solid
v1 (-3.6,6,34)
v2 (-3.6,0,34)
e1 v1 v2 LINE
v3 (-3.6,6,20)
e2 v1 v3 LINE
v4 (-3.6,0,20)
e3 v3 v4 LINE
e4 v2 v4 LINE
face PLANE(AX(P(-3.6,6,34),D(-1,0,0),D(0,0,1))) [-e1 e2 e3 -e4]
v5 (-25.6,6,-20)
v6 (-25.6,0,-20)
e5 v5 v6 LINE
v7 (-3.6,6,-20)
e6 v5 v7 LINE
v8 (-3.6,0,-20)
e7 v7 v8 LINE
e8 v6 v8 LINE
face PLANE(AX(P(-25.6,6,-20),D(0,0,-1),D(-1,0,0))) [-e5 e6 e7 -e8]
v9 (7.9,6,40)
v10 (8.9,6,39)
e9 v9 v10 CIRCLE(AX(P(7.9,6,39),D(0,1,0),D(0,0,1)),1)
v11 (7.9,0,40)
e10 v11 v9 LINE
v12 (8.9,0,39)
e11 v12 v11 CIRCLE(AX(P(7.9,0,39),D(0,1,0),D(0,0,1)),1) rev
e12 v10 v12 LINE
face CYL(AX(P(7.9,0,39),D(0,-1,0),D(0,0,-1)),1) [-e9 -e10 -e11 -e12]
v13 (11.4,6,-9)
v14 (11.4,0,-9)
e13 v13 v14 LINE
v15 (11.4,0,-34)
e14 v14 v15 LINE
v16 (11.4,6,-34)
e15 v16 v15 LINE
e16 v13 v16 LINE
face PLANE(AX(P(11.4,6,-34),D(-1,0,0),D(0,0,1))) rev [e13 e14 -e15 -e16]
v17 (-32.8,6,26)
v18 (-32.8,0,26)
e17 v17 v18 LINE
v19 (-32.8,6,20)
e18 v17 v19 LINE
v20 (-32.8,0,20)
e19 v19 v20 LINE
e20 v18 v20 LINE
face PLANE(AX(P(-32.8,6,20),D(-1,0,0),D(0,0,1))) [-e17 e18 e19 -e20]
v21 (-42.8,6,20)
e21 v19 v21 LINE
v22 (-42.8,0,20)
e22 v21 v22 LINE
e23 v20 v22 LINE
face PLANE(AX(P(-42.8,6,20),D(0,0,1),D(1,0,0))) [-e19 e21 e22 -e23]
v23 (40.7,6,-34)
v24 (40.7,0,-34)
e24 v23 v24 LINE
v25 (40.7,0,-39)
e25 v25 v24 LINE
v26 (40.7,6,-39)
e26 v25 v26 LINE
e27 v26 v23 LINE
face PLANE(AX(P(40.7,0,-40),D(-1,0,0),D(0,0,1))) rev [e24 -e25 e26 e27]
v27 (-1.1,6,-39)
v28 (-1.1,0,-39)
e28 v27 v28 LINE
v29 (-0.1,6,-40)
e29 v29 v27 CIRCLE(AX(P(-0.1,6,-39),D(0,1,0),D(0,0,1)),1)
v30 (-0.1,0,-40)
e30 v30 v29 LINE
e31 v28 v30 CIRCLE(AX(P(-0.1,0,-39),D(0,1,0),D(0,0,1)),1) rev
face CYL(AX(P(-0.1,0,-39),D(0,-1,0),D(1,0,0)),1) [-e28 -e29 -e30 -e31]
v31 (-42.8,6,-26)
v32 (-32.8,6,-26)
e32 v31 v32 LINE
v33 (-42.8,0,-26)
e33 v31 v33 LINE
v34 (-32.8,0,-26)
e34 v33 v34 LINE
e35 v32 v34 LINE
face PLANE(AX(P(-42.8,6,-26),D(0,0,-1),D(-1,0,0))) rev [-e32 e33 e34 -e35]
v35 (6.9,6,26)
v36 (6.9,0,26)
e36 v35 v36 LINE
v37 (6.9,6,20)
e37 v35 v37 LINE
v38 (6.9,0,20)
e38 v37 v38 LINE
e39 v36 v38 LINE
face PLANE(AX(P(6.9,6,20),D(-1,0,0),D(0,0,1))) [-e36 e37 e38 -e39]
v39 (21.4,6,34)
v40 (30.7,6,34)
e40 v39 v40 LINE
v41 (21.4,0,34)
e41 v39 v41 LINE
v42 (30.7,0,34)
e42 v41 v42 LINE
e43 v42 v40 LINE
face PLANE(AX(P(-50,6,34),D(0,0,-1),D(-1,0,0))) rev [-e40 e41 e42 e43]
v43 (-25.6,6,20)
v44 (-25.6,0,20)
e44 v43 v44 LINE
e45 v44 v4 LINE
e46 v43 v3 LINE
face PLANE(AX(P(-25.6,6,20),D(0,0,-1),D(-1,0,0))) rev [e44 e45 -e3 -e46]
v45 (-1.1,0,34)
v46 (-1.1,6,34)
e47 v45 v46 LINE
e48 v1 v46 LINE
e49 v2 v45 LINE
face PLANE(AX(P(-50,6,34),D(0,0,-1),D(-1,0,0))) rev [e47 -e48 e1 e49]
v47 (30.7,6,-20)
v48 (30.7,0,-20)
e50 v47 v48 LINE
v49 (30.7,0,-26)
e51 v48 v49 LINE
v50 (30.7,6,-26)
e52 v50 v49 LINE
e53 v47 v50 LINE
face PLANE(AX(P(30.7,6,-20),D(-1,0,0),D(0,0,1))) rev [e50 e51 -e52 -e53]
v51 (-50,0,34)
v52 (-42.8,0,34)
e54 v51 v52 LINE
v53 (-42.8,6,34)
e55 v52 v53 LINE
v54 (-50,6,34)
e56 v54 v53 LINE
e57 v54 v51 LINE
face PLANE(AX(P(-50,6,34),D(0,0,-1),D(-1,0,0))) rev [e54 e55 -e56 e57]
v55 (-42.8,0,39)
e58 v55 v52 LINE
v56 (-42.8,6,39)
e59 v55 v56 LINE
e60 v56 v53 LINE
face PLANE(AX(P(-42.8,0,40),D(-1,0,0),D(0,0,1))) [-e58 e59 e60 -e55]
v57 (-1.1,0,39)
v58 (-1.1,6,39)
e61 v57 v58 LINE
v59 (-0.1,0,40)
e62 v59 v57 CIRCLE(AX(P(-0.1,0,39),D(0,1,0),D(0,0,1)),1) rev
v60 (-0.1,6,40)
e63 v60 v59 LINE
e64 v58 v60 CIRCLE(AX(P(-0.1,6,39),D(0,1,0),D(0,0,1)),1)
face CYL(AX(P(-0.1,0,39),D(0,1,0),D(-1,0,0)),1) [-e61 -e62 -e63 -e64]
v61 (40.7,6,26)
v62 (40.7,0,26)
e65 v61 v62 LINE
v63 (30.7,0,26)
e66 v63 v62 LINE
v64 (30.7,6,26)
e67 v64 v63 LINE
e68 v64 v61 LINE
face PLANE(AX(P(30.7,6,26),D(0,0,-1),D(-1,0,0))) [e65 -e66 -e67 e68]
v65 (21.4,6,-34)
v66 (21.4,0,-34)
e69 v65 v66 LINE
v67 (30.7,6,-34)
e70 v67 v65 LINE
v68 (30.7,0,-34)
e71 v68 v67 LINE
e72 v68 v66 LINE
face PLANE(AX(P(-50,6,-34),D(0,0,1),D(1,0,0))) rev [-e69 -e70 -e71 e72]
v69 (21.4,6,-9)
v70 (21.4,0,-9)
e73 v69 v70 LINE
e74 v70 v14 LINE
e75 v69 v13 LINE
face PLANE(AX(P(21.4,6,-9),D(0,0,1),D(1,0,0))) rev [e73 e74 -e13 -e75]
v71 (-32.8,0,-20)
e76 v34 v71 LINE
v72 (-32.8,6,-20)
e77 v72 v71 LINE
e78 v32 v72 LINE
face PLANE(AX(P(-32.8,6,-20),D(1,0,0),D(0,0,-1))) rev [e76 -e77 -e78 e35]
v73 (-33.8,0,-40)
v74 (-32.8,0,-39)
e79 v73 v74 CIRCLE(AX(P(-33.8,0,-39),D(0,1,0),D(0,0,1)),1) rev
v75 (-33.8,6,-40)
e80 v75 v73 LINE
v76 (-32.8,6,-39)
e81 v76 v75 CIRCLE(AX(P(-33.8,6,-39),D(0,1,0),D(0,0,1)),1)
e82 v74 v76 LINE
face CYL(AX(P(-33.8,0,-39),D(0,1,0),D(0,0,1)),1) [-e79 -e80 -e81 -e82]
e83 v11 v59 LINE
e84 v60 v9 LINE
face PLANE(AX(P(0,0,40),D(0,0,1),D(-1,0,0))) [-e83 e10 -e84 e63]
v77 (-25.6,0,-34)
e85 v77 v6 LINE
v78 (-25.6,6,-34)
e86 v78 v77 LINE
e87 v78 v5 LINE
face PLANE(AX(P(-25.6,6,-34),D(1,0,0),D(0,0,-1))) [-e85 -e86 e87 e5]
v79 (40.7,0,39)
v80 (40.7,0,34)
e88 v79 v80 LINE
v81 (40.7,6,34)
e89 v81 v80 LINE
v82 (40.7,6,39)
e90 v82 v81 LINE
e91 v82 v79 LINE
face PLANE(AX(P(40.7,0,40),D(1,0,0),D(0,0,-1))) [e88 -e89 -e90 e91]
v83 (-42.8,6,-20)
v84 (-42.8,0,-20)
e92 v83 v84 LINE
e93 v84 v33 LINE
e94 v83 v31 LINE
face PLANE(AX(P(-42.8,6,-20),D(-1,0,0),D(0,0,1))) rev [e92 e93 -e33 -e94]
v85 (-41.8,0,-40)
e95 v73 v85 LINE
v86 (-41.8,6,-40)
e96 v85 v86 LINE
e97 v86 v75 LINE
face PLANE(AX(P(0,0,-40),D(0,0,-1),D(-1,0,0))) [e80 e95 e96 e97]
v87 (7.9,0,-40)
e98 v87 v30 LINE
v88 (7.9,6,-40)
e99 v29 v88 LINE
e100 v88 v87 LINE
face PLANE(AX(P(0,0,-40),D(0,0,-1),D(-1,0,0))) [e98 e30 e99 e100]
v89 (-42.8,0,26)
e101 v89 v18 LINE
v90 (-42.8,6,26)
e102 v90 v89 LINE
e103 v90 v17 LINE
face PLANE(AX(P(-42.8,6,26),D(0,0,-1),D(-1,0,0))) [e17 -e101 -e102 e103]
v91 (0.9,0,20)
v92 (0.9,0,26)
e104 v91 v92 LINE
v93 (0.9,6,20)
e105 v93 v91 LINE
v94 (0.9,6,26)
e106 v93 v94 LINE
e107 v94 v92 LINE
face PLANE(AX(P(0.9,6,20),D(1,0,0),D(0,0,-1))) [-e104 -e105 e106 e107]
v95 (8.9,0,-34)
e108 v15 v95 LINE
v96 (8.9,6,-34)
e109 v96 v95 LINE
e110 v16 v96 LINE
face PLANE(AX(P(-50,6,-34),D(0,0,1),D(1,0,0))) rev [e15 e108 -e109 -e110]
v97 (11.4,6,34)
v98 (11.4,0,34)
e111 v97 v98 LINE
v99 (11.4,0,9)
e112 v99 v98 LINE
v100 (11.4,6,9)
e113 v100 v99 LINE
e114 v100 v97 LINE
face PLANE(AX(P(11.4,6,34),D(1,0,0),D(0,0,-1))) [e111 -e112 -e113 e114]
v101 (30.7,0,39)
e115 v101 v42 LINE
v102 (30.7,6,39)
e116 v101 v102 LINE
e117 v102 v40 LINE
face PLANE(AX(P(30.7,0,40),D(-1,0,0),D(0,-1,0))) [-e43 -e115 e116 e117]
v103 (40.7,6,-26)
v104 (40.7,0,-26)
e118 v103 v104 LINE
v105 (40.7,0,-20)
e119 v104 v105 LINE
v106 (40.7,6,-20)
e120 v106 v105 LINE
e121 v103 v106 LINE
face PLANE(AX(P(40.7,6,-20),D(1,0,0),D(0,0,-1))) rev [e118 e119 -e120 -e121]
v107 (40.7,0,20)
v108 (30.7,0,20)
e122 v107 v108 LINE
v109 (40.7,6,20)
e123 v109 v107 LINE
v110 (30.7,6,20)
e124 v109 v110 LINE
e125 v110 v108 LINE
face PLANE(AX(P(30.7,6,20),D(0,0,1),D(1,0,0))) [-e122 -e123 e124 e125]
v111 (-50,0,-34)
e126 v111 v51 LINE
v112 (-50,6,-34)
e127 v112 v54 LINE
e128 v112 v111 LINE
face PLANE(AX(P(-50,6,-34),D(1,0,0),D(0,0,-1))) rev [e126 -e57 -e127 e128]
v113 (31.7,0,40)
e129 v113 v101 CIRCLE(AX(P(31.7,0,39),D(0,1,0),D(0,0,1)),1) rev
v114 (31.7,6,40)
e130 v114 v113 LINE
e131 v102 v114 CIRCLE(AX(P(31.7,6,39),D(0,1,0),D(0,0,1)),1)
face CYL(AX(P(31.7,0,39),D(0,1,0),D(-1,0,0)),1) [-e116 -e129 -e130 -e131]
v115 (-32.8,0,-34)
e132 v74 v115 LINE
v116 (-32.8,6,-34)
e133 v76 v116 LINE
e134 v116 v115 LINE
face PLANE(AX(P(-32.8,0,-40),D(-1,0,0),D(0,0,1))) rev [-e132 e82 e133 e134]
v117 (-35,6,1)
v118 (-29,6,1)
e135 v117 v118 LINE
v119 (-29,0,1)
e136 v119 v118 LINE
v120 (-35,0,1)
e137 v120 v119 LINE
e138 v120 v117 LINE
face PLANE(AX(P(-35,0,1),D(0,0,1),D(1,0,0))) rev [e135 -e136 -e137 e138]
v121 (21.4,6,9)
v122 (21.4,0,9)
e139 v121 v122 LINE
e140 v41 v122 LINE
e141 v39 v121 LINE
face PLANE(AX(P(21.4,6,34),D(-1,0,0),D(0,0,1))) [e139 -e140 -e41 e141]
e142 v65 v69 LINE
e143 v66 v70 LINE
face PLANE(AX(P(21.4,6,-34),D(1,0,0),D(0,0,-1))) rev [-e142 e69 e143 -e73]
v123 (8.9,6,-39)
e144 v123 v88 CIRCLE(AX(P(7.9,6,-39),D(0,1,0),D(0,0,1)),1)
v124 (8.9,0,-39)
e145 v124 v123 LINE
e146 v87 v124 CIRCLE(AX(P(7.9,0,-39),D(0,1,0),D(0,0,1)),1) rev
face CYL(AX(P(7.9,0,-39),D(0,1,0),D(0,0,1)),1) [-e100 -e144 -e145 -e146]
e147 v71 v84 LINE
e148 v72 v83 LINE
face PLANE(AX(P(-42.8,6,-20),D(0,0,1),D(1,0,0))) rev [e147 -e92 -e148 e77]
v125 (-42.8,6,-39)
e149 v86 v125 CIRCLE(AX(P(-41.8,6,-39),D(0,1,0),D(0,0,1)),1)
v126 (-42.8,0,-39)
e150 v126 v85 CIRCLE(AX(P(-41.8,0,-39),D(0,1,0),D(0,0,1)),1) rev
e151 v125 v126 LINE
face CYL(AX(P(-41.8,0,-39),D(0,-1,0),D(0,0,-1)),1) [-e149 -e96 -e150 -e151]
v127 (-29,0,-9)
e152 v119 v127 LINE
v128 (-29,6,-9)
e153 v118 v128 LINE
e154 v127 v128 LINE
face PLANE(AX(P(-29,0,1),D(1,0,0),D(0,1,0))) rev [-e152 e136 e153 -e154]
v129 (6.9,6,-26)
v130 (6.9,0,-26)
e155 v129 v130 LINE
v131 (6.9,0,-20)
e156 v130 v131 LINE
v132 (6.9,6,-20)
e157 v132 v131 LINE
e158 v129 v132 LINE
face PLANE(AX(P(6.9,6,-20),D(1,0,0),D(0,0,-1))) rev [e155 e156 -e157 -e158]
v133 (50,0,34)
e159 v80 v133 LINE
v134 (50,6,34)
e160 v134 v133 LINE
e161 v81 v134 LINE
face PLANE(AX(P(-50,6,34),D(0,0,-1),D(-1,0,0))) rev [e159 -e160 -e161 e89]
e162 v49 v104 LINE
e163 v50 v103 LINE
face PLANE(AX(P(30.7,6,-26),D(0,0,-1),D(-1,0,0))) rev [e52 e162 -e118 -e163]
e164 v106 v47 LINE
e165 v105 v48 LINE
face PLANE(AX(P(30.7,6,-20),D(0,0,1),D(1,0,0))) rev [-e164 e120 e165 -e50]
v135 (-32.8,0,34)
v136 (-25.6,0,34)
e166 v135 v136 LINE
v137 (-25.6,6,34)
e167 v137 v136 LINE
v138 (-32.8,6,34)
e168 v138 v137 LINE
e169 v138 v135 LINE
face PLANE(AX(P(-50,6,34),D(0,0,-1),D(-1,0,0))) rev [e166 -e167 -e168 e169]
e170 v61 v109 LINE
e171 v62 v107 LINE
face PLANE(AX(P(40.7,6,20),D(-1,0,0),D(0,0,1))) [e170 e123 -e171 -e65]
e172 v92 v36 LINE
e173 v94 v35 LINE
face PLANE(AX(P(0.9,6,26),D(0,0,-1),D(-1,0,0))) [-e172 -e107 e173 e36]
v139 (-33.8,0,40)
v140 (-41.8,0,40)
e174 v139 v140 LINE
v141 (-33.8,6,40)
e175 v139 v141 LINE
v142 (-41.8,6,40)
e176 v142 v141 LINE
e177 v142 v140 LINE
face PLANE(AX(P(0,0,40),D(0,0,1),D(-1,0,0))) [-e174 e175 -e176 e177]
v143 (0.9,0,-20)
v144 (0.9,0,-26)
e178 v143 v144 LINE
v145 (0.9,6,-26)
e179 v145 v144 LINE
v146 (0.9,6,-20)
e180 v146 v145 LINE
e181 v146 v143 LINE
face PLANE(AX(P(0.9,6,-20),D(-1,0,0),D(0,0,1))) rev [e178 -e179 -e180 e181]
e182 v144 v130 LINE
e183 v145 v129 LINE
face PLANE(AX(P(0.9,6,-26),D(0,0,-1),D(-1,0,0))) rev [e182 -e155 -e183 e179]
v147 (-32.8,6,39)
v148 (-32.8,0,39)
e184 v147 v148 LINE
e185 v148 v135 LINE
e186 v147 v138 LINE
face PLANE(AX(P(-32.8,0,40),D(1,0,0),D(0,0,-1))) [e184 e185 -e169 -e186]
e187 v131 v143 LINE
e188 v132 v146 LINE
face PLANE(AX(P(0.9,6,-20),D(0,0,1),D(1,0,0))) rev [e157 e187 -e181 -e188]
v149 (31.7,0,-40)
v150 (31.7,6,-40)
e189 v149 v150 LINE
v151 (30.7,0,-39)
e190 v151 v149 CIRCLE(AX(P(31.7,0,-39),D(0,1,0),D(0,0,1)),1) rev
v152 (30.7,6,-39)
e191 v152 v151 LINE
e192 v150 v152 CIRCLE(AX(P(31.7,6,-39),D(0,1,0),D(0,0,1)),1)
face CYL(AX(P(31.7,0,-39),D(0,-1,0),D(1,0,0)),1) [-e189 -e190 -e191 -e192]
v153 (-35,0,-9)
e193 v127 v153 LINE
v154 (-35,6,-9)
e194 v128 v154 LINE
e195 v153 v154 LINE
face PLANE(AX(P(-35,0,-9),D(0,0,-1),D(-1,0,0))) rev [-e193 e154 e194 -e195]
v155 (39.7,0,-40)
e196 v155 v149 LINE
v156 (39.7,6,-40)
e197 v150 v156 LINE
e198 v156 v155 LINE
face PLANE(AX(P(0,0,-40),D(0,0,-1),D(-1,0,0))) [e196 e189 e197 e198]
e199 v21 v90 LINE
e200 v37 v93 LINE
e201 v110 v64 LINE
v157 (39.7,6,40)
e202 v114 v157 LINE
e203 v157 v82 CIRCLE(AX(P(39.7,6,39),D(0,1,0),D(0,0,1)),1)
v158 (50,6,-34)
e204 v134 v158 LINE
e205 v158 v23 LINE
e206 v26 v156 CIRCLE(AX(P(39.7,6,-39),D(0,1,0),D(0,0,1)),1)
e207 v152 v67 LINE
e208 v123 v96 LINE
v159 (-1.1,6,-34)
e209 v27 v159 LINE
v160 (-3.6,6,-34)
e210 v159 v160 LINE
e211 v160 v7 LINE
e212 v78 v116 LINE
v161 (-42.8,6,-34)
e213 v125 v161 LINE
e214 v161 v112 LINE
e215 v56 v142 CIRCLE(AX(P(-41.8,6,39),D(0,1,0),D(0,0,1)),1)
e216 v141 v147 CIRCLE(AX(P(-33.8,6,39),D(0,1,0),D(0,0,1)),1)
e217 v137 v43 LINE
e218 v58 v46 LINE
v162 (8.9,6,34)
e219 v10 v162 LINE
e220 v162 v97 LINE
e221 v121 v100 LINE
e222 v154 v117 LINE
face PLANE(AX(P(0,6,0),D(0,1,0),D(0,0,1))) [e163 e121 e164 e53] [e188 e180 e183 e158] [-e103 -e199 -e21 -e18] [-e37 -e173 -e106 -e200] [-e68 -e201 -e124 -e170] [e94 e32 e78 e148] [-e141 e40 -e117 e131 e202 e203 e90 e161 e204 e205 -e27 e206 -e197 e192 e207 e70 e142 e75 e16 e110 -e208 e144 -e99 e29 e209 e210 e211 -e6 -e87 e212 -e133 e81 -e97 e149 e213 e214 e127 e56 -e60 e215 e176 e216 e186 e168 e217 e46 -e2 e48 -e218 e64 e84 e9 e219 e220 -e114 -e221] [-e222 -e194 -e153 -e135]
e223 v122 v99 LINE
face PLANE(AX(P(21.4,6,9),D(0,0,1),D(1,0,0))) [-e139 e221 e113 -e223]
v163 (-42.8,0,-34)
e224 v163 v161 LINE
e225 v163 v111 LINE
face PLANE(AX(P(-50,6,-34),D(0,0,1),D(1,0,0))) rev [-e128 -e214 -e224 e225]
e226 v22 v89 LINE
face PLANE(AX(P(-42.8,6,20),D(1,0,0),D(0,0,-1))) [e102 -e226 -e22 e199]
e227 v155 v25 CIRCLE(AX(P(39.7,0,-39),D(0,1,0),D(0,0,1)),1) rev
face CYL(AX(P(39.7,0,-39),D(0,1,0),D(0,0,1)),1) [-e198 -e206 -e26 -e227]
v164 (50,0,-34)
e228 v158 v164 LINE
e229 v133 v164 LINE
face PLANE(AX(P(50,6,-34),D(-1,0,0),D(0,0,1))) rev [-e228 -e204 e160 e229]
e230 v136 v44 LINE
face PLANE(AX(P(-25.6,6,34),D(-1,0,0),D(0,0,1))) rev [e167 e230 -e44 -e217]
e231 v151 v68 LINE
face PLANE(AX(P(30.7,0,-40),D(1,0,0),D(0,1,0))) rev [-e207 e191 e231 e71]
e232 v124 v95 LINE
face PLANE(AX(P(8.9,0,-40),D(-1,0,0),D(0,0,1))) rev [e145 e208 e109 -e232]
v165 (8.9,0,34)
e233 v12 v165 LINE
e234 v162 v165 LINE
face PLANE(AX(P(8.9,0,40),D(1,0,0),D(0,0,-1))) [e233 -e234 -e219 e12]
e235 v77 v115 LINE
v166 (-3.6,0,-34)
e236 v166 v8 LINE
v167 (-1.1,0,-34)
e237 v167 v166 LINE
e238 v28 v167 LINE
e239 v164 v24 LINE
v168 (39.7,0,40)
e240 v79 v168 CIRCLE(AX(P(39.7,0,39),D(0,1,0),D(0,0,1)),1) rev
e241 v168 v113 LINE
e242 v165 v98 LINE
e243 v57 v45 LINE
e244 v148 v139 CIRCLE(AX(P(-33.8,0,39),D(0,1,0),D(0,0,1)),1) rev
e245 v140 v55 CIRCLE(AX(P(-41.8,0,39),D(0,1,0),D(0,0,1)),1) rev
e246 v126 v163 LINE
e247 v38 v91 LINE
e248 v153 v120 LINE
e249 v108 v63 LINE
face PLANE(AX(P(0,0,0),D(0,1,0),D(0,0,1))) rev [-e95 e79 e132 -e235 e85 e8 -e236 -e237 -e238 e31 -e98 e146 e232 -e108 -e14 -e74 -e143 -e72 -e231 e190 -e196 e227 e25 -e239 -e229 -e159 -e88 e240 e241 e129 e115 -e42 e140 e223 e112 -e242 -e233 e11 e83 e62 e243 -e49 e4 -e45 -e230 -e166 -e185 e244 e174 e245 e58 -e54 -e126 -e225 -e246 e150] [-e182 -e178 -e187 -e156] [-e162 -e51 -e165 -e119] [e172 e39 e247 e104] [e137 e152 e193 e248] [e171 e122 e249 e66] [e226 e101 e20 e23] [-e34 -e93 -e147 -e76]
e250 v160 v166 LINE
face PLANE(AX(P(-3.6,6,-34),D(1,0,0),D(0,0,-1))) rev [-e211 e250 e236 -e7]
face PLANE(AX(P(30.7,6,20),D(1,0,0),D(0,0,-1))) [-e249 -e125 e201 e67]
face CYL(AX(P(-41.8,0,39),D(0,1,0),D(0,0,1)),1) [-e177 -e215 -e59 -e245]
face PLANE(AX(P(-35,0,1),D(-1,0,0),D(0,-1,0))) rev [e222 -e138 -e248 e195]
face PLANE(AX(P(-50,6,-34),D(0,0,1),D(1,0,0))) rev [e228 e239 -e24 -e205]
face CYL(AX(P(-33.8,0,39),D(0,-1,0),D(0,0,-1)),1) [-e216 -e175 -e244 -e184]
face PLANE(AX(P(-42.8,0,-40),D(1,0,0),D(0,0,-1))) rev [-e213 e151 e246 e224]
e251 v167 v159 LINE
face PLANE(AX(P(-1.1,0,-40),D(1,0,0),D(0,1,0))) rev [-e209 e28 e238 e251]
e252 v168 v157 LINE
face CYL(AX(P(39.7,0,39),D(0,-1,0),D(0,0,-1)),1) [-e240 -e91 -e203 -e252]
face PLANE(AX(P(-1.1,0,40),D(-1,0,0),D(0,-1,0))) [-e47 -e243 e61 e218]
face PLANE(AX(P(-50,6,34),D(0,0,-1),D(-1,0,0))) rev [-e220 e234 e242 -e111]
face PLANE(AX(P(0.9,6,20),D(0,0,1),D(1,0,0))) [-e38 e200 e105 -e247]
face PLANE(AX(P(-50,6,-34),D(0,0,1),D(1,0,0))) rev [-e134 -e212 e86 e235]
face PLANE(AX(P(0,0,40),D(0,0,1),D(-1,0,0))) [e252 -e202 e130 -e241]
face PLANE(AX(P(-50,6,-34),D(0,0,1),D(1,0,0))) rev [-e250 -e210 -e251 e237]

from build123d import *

# Parameters (mm, degrees)
SKETCH1_W                                   = 100
SKETCH1_H                                   = 68
BOSS_EXTRUDE1_DEPTH                         = 6
SKETCH2_W                                   = 10
SKETCH2_H                                   = 25
CUT_EXTRUDE1_DEPTH                          = 61.761830124
SKETCH3_W                                   = 22
SKETCH3_H                                   = 14
CUT_EXTRUDE2_DEPTH                          = 61.761830124
SKETCH234_W                                 = 10
SKETCH234_H                                 = 6
BOSS_EXTRUDE234_DEPTH                       = 6
FILLET134_R                                 = 1
SKETCH2341_W                                = 10
SKETCH2341_H                                = 6
BOSS_EXTRUDE2341_DEPTH                      = 6
FILLET1341_R                                = 1
SKETCH2342_W                                = 10
SKETCH2342_H                                = 6
BOSS_EXTRUDE2342_DEPTH                      = 6
FILLET1342_R                                = 1
SKETCH6_W                                   = 10
SKETCH6_H                                   = 6
CUT_EXTRUDE11_DEPTH                         = 105.61109994
SKETCH62_W                                  = 10
SKETCH62_H                                  = 6
CUT_EXTRUDE13_DEPTH                         = 108.583694896
CUT_EXTRUDE110_START                        = -3
SKETCH67_W                                  = 6
SKETCH67_H                                  = 6
CUT_EXTRUDE110_DEPTH                        = 6
FILLET134_OF_MIRROR2_R                      = 1
FILLET1341_OF_MIRROR2_R                     = 1
FILLET1342_OF_MIRROR2_R                     = 1
SMART_FEATURE3_VIRTUAL_PIN_51_START         = 34
SMART_FEATURE3_VIRTUAL_PIN_51_OUTLINE_W     = 10
SMART_FEATURE3_VIRTUAL_PIN_51_OUTLINE_H     = 6
SMART_FEATURE3_VIRTUAL_PIN_51_DEPTH         = 6
SMART_FEATURE3_VIRTUAL_PIN_51_START_2       = 20
SMART_FEATURE3_VIRTUAL_PIN_51_2_OUTLINE_W   = 10
SMART_FEATURE3_VIRTUAL_PIN_51_2_OUTLINE_H   = 6
SMART_FEATURE3_VIRTUAL_PIN_51_2_OUTLINE_W_2 = 6
SMART_FEATURE3_VIRTUAL_PIN_51_2_DEPTH       = 6
CUT_EXTRUDE16_START                         = -3
CUT_EXTRUDE16_OUTLINE_W                     = 6
CUT_EXTRUDE16_OUTLINE_H                     = 10
CUT_EXTRUDE16_OUTLINE_H_2                   = 6
CUT_EXTRUDE16_OUTLINE_W_2                   = 10
CUT_EXTRUDE16_DEPTH                         = 6
CUT_EXTRUDE16_2_DEPTH                       = 6


# Read off the part's stored shape, not the designer's step: Smart-Feature3<virtual_pin-51>, Cut-Extrude16
with BuildPart() as part:
    # Sketch1 → Boss-Extrude1 (new body)
    with BuildSketch(Plane(origin=(0, 0, 0), x_dir=(1, 0, 0), z_dir=(0, 1, 0))):
        Rectangle(SKETCH1_W, SKETCH1_H)
    extrude(amount=BOSS_EXTRUDE1_DEPTH)

    # Sketch2 → Cut-Extrude1 (cut, through all)
    with BuildSketch(Plane.XZ):
        with Locations((16.4, -21.5)):
            Rectangle(SKETCH2_W, SKETCH2_H)
    cut_extrude1 = extrude(amount=-CUT_EXTRUDE1_DEPTH, mode=Mode.SUBTRACT)

    # Sketch3 → Cut-Extrude2 (cut, through all)
    with BuildSketch(Plane.XZ):
        with Locations((-14.6, -27)):
            Rectangle(SKETCH3_W, SKETCH3_H)
    cut_extrude2 = extrude(amount=-CUT_EXTRUDE2_DEPTH, mode=Mode.SUBTRACT)

    # Mirror1: Cut-Extrude1, Cut-Extrude2 across plane
    add(cut_extrude1.mirror(Plane.XY), mode=Mode.SUBTRACT)
    add(cut_extrude2.mirror(Plane.XY), mode=Mode.SUBTRACT)

    # Sketch234 → Boss-Extrude234 (add)
    with BuildSketch(Plane(origin=(34.932221392, 6, -34), x_dir=(1, 0, 0), z_dir=(0, 0, -1))):
        with Locations((0.767778608, 3)):
            Rectangle(SKETCH234_W, SKETCH234_H)
    boss_extrude234 = extrude(amount=BOSS_EXTRUDE234_DEPTH)

    # Fillet134
    fillet134_edges = [part.edges().sort_by_distance(p)[0] for p in [
        (40.7, 3, -40),
        (30.7, 3, -40),
    ]]
    fillet(fillet134_edges, radius=FILLET134_R)

    # Sketch2341 → Boss-Extrude2341 (add)
    with BuildSketch(Plane(origin=(3.132221392, 6, -34), x_dir=(1, 0, 0), z_dir=(0, 0, -1))):
        with Locations((0.767778608, 3)):
            Rectangle(SKETCH2341_W, SKETCH2341_H)
    boss_extrude2341 = extrude(amount=BOSS_EXTRUDE2341_DEPTH)

    # Fillet1341
    fillet1341_edges = [part.edges().sort_by_distance(p)[0] for p in [
        (8.9, 3, -40),
        (-1.1, 3, -40),
    ]]
    fillet(fillet1341_edges, radius=FILLET1341_R)

    # Sketch2342 → Boss-Extrude2342 (add)
    with BuildSketch(Plane(origin=(-38.567778608, 6, -34), x_dir=(1, 0, 0), z_dir=(0, 0, -1))):
        with Locations((0.767778608, 3)):
            Rectangle(SKETCH2342_W, SKETCH2342_H)
    boss_extrude2342 = extrude(amount=BOSS_EXTRUDE2342_DEPTH)

    # Fillet1342
    fillet1342_edges = [part.edges().sort_by_distance(p)[0] for p in [
        (-32.8, 3, -40),
        (-42.8, 3, -40),
    ]]
    fillet(fillet1342_edges, radius=FILLET1342_R)

    # Sketch6 → Cut-Extrude11 (cut, symmetric)
    with BuildSketch(Plane(origin=(34.932221392, 3, 21), x_dir=(1, 0, 0), z_dir=(0, -1, 0))):
        with Locations((0.767778608, -44)):
            Rectangle(SKETCH6_W, SKETCH6_H)
    cut_extrude11 = extrude(amount=CUT_EXTRUDE11_DEPTH, both=True, mode=Mode.SUBTRACT)

    # Sketch62 → Cut-Extrude13 (cut, symmetric)
    with BuildSketch(Plane(origin=(-38.567778608, 3, 21), x_dir=(1, 0, 0), z_dir=(0, -1, 0))):
        with Locations((0.767778608, -44)):
            Rectangle(SKETCH62_W, SKETCH62_H)
    cut_extrude13 = extrude(amount=CUT_EXTRUDE13_DEPTH, both=True, mode=Mode.SUBTRACT)

    # Sketch67 → Cut-Extrude110 (cut)
    with BuildSketch(Plane(origin=(3.132221392, 3, 21), x_dir=(1, 0, 0), z_dir=(0, -1, 0)).offset(CUT_EXTRUDE110_START)):
        with Locations((0.767778608, -44)):
            Rectangle(SKETCH67_W, SKETCH67_H)
    cut_extrude110 = extrude(amount=CUT_EXTRUDE110_DEPTH, mode=Mode.SUBTRACT)

    # Mirror2: Boss-Extrude234, Boss-Extrude2341, Boss-Extrude2342, Cut-Extrude11, Cut-Extrude13, Cut-Extrude110 across plane
    add(boss_extrude234.mirror(Plane.XY))
    add(boss_extrude2341.mirror(Plane.XY))
    add(boss_extrude2342.mirror(Plane.XY))
    add(cut_extrude11.mirror(Plane.XY), mode=Mode.SUBTRACT)
    add(cut_extrude13.mirror(Plane.XY), mode=Mode.SUBTRACT)
    add(cut_extrude110.mirror(Plane.XY), mode=Mode.SUBTRACT)

    # Fillet134 of Mirror2
    fillet134_of_mirror2_edges = [part.edges().sort_by_distance(p)[0] for p in [
        (40.7, 3, 40),
        (30.7, 3, 40),
    ]]
    fillet(fillet134_of_mirror2_edges, radius=FILLET134_OF_MIRROR2_R)

    # Fillet1341 of Mirror2
    fillet1341_of_mirror2_edges = [part.edges().sort_by_distance(p)[0] for p in [
        (8.9, 3, 40),
        (-1.1, 3, 40),
    ]]
    fillet(fillet1341_of_mirror2_edges, radius=FILLET1341_OF_MIRROR2_R)

    # Fillet1342 of Mirror2
    fillet1342_of_mirror2_edges = [part.edges().sort_by_distance(p)[0] for p in [
        (-32.8, 3, 40),
        (-42.8, 3, 40),
    ]]
    fillet(fillet1342_of_mirror2_edges, radius=FILLET1342_OF_MIRROR2_R)

    # Smart-Feature3<virtual_pin-51> outline → Smart-Feature3<virtual_pin-51> (cut)
    with BuildSketch(Plane.XY.offset(SMART_FEATURE3_VIRTUAL_PIN_51_START)):
        with Locations((35.7, 3)):
            Rectangle(SMART_FEATURE3_VIRTUAL_PIN_51_OUTLINE_W, SMART_FEATURE3_VIRTUAL_PIN_51_OUTLINE_H)
        with Locations((3.9, 3)):
            Rectangle(SMART_FEATURE3_VIRTUAL_PIN_51_OUTLINE_W, SMART_FEATURE3_VIRTUAL_PIN_51_OUTLINE_H)
        with Locations((-37.8, 3)):
            Rectangle(SMART_FEATURE3_VIRTUAL_PIN_51_OUTLINE_W, SMART_FEATURE3_VIRTUAL_PIN_51_OUTLINE_H)
    extrude(amount=SMART_FEATURE3_VIRTUAL_PIN_51_DEPTH, mode=Mode.SUBTRACT)

    # Smart-Feature3_virtual_pin-51 2 outline → Smart-Feature3_virtual_pin-51 2 (add)
    with BuildSketch(Plane.XY.offset(SMART_FEATURE3_VIRTUAL_PIN_51_START_2)):
        with Locations((35.7, 3)):
            Rectangle(SMART_FEATURE3_VIRTUAL_PIN_51_2_OUTLINE_W, SMART_FEATURE3_VIRTUAL_PIN_51_2_OUTLINE_H)
        with Locations((3.9, 3)):
            Rectangle(SMART_FEATURE3_VIRTUAL_PIN_51_2_OUTLINE_W_2, SMART_FEATURE3_VIRTUAL_PIN_51_2_OUTLINE_H)
        with Locations((-37.8, 3)):
            Rectangle(SMART_FEATURE3_VIRTUAL_PIN_51_2_OUTLINE_W, SMART_FEATURE3_VIRTUAL_PIN_51_2_OUTLINE_H)
    extrude(amount=SMART_FEATURE3_VIRTUAL_PIN_51_2_DEPTH)

    # Cut-Extrude16 outline → Cut-Extrude16 (cut)
    with BuildSketch(Plane(origin=(-76, 3, -3.232221392), x_dir=(0, 0, -1), z_dir=(0, 1, 0)).offset(CUT_EXTRUDE16_START)):
        with Locations((-26.232221392, -111.7)):
            Rectangle(CUT_EXTRUDE16_OUTLINE_W, CUT_EXTRUDE16_OUTLINE_H)
        with Locations((-26.232221392, -38.2)):
            Rectangle(CUT_EXTRUDE16_OUTLINE_W, CUT_EXTRUDE16_OUTLINE_H)
        with Locations((-26.232221392, -79.9)):
            Rectangle(CUT_EXTRUDE16_OUTLINE_W, CUT_EXTRUDE16_OUTLINE_H_2)
        with Locations((0.767778608, -44)):
            Rectangle(CUT_EXTRUDE16_OUTLINE_W_2, CUT_EXTRUDE16_OUTLINE_H_2)
    extrude(amount=CUT_EXTRUDE16_DEPTH, mode=Mode.SUBTRACT)

    # Cut-Extrude16 2 outline → Cut-Extrude16 2 (add)
    with BuildSketch(Plane(origin=(-76, 3, -3.232221392), x_dir=(0, 0, -1), z_dir=(0, 1, 0)).offset(CUT_EXTRUDE16_START)):
        with BuildLine():
            ThreePointArc((-43.232221392, -115.7), (-42.939328173, -116.407106781), (-42.232221392, -116.7))
            Line((-42.232221392, -116.7), (-37.232221392, -116.7))
            Line((-37.232221392, -116.7), (-37.232221392, -106.7))
            Line((-37.232221392, -106.7), (-42.232221392, -106.7))
            ThreePointArc((-42.232221392, -106.7), (-42.939328173, -106.992893219), (-43.232221392, -107.7))
            Line((-43.232221392, -107.7), (-43.232221392, -115.7))
        make_face()
        with BuildLine():
            ThreePointArc((-43.232221392, -83.9), (-42.939328173, -84.607106781), (-42.232221392, -84.9))
            Line((-42.232221392, -84.9), (-37.232221392, -84.9))
            Line((-37.232221392, -84.9), (-37.232221392, -74.9))
            Line((-37.232221392, -74.9), (-42.232221392, -74.9))
            ThreePointArc((-42.232221392, -74.9), (-42.939328173, -75.192893219), (-43.232221392, -75.9))
            Line((-43.232221392, -75.9), (-43.232221392, -83.9))
        make_face()
        with BuildLine():
            ThreePointArc((-43.232221392, -42.2), (-42.939328173, -42.907106781), (-42.232221392, -43.2))
            Line((-42.232221392, -43.2), (-37.232221392, -43.2))
            Line((-37.232221392, -43.2), (-37.232221392, -33.2))
            Line((-37.232221392, -33.2), (-42.232221392, -33.2))
            ThreePointArc((-42.232221392, -33.2), (-42.939328173, -33.492893219), (-43.232221392, -34.2))
            Line((-43.232221392, -34.2), (-43.232221392, -42.2))
        make_face()
    extrude(amount=CUT_EXTRUDE16_2_DEPTH)


solid = part.part
